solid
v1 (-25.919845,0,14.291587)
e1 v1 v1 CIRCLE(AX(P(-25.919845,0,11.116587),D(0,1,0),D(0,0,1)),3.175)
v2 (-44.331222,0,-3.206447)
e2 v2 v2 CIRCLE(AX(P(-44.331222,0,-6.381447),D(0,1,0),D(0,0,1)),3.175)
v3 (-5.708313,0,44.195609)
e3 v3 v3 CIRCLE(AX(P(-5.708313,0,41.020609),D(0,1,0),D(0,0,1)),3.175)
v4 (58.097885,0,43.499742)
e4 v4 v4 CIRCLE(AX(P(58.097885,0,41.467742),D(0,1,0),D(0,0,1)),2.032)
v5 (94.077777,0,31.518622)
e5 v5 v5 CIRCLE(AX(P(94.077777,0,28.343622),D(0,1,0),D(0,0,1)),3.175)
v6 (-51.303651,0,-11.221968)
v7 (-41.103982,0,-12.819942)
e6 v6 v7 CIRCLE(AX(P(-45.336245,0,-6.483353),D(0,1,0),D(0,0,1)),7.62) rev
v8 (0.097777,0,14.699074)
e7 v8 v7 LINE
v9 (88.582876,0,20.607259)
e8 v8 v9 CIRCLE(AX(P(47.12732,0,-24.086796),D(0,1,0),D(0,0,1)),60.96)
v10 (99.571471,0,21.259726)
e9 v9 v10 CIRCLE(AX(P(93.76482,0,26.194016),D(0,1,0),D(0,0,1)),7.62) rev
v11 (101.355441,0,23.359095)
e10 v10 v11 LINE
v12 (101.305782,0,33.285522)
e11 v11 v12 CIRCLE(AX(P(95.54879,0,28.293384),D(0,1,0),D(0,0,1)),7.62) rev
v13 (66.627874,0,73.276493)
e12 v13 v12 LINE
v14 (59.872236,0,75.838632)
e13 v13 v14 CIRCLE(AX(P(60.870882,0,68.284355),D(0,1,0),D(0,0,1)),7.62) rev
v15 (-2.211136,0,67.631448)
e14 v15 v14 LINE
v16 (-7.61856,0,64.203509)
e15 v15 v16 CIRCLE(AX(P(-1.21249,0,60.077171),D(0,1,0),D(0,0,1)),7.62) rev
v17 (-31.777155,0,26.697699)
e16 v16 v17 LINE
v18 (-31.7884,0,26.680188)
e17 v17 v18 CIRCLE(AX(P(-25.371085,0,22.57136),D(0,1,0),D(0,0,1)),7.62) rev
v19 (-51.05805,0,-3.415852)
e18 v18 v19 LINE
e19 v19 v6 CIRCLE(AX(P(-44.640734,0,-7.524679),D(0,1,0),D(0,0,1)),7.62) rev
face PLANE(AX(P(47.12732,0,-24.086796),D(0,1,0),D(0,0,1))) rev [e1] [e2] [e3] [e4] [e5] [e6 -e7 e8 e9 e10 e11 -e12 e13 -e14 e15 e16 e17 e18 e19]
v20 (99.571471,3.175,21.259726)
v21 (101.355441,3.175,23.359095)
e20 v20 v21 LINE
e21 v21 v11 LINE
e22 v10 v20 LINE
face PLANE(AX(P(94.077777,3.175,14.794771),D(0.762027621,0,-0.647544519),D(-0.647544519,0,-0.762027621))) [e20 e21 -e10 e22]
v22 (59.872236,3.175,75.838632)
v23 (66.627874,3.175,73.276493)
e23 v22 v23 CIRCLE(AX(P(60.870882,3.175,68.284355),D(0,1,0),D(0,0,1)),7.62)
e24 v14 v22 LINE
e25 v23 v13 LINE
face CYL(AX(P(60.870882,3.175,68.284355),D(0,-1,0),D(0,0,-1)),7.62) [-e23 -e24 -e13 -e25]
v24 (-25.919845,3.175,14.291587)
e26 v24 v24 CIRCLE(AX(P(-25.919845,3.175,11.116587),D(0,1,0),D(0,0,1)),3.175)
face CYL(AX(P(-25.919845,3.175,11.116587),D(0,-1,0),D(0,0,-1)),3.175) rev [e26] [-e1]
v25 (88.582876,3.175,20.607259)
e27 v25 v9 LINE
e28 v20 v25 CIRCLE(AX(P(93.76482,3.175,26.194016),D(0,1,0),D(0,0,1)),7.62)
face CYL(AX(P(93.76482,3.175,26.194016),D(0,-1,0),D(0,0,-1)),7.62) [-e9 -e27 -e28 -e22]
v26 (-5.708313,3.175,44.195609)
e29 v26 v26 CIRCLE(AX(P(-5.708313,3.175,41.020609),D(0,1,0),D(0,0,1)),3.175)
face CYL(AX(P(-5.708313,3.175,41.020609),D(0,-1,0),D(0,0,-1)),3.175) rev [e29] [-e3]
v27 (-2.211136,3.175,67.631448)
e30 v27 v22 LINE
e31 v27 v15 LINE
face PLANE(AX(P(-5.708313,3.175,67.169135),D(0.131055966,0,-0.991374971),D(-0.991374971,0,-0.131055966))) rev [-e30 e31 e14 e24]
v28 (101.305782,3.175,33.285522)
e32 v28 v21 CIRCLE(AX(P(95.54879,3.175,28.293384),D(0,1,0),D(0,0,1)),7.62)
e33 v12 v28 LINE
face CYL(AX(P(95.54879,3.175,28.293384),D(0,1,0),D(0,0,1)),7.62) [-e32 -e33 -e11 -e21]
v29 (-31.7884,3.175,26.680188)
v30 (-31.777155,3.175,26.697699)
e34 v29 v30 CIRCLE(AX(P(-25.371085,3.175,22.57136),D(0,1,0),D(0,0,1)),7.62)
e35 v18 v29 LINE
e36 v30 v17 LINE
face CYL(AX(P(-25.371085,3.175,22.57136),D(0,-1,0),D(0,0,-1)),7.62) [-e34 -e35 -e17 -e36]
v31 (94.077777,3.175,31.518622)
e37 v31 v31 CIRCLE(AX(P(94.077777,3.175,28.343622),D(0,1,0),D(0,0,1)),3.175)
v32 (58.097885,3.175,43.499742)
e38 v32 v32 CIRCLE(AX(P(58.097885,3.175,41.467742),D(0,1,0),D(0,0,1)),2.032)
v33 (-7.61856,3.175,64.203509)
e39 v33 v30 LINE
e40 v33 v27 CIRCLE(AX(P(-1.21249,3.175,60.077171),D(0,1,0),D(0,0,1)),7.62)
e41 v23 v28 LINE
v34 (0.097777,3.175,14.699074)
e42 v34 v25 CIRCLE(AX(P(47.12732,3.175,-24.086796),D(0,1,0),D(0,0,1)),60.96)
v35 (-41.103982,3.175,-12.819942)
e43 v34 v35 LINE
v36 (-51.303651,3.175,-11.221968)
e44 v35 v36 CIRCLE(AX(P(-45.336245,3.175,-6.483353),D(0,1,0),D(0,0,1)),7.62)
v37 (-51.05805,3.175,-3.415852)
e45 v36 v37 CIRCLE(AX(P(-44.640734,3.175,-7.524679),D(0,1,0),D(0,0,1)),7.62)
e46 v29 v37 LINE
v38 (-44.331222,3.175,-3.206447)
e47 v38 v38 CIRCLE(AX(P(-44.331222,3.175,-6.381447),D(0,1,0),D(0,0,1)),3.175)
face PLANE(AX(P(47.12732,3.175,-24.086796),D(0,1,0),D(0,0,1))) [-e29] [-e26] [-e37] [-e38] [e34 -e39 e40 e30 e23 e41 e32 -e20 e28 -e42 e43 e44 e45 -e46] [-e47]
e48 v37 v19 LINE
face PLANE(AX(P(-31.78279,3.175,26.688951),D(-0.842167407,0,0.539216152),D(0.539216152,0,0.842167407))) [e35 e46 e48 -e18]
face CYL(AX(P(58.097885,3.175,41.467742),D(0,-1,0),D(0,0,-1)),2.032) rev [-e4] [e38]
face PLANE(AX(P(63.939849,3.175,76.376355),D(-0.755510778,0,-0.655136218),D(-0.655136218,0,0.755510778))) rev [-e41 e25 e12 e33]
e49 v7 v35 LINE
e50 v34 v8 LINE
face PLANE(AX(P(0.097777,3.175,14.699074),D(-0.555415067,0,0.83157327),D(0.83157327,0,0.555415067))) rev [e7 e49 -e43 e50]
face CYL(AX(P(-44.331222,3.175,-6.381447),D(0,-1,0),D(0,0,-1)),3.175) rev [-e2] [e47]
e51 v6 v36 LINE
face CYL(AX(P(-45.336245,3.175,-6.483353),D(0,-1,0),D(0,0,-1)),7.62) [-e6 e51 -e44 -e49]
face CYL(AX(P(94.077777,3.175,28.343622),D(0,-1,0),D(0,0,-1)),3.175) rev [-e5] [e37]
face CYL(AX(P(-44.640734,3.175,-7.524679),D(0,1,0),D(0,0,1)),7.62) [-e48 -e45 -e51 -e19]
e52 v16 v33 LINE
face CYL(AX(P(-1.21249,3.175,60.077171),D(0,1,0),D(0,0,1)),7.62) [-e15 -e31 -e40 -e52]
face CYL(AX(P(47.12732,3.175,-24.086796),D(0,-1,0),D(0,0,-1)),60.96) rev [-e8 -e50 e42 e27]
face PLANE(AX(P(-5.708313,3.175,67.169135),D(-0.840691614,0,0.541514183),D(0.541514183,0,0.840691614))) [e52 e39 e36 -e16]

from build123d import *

# Parameters (mm, degrees)
SKETCH1_R           = 3.175
SKETCH1_R_2         = 2.032
BOSS_EXTRUDE1_DEPTH = 3.175
FILLET1_R           = 7.62


with BuildPart() as part:
    # Sketch1 → Boss-Extrude1 (new body)
    # profile 1 of 2: a face of its own
    with BuildSketch(Plane(origin=(0, 0, 0), x_dir=(1, 0, 0), z_dir=(0, 1, 0))):
        with BuildLine():
            Line((105.591118199, -28.343622072), (94.077776645, -14.794770967))
            ThreePointArc((94.077776645, -14.794770967), (47.065246085, -36.873172811), (0.097776645, -14.699073687))
            Line((0.097776645, -14.699073687), (-31.782789553, -26.688950722))
            Line((-31.782789553, -26.688950722), (-5.708312831, -67.169135043))
            Line((-5.708312831, -67.169135043), (63.939848964, -76.376354726))
            Line((63.939848964, -76.376354726), (105.591118199, -28.343622072))
        make_face()
        with Locations(Location((-5.708312831, -41.020609427, 0), (0, 0, 270))):
            Circle(SKETCH1_R, mode=Mode.SUBTRACT)
        with Locations(Location((58.097885383, -41.467741904, 0), (0, 0, 270))):
            Circle(SKETCH1_R_2, mode=Mode.SUBTRACT)
        with Locations(Location((94.077776645, -28.343622072, 0), (0, 0, 270))):
            Circle(SKETCH1_R, mode=Mode.SUBTRACT)
    # profile 2 of 2: a face of its own
    with BuildSketch(Plane(origin=(0, 0, 0), x_dir=(1, 0, 0), z_dir=(0, 1, 0))):
        Polygon((-31.782789553, -26.688950722), (0.097776645, -14.699073687), (-47.44057022, 17.052204331), (-53.745234427, 7.612794876), align=None)
        with Locations(Location((-25.919844617, -11.116586696, 0), (0, 0, 270))):
            Circle(SKETCH1_R, mode=Mode.SUBTRACT)
        with Locations(Location((-44.331222359, 6.381446612, 0), (0, 0, 270))):
            Circle(SKETCH1_R, mode=Mode.SUBTRACT)
    extrude(amount=BOSS_EXTRUDE1_DEPTH)

    # Fillet1
    # the kernel refuses this fillet: 7.62 mm, written as the material it takes off along each edge
    with BuildSketch(Plane(origin=(94.077776645, -21.209715088, 14.794770967), x_dir=(0.6475445193715758, 0, 0.7620276211738226), z_dir=(0, 1, 0))) as fillet1_piece_1:
        with BuildLine():
            CenterArc((8.483886035, -7.62), FILLET1_R, 90, 92.490451597)
            ThreePointArc((0.871083301, -7.951111055), (0.566092443, -3.961253046), (0, 0))
            Line((0, 0), (8.483886035, 0))
        make_face()
    extrude(amount=45.594430177, mode=Mode.SUBTRACT)
    with BuildSketch(Plane(origin=(105.591118199, -16.352843569, 28.343622072), x_dir=(-0.6551362182138352, 0, 0.755510777940642), z_dir=(0, 1, 0))) as fillet1_piece_2:
        with BuildLine():
            CenterArc((FILLET1_R * 0.858416985261, -FILLET1_R), FILLET1_R, 90, 81.28670352)
            Line((-FILLET1_R * 0.130041772231, -FILLET1_R * 0.848509786661), (0, 0))
            Line((0, 0), (FILLET1_R * 0.858416985261, 0))
        make_face()
    extrude(amount=35.880687138, mode=Mode.SUBTRACT)
    with BuildSketch(Plane(origin=(63.939848964, -10.25750483, 76.376354726), x_dir=(0.6551362182138344, 0, -0.7555107779406426), z_dir=(0, 1, 0))) as fillet1_piece_3:
        with BuildLine():
            CenterArc((FILLET1_R * 0.538451697109, FILLET1_R), FILLET1_R, 213.399362726, 56.600637274)
            Line((-FILLET1_R * 0.296402288845, FILLET1_R * 0.449528545576), (0, 0))
            Line((0, 0), (FILLET1_R * 0.538451697109, 0))
        make_face()
    extrude(amount=23.69000966, mode=Mode.SUBTRACT)
    with BuildSketch(Plane(origin=(-5.708312831, -8.81900629, 67.169135043), x_dir=(0.9913749712814725, 0, 0.13105596635277514), z_dir=(0, 1, 0))) as fillet1_piece_4:
        with BuildLine():
            CenterArc((FILLET1_R * 0.462939962752, FILLET1_R), FILLET1_R, 220.317392239, 49.682607761)
            Line((-FILLET1_R * 0.29953199758, FILLET1_R * 0.352978740916), (0, 0))
            Line((0, 0), (FILLET1_R * 0.462939962752, 0))
        make_face()
    extrude(amount=20.813012581, mode=Mode.SUBTRACT)
    with BuildSketch(Plane(origin=(-47.44057022, -19.05, -17.052204331), x_dir=(0.8315732701891384, 0, 0.5554150666906167), z_dir=(0, 1, 0))) as fillet1_piece_5:
        with BuildLine():
            CenterArc((FILLET1_R, -FILLET1_R), FILLET1_R, 90, 90)
            Line((0, -FILLET1_R), (0, 0))
            Line((0, 0), (FILLET1_R, 0))
        make_face()
    extrude(amount=41.275, mode=Mode.SUBTRACT)
    with BuildSketch(Plane(origin=(-53.745234427, -12.458754806, -7.612794876), x_dir=(0.5392161516528728, 0, 0.8421674072277234), z_dir=(0, 1, 0))) as fillet1_piece_6:
        with BuildLine():
            CenterArc((FILLET1_R * 0.654002876977, FILLET1_R), FILLET1_R, 203.630396876, 66.369603124)
            Line((-FILLET1_R * 0.262147328242, FILLET1_R * 0.599164869956), (0, 0))
            Line((0, 0), (FILLET1_R * 0.654002876977, 0))
        make_face()
    extrude(amount=28.092509613, mode=Mode.SUBTRACT)


solid = part.part
